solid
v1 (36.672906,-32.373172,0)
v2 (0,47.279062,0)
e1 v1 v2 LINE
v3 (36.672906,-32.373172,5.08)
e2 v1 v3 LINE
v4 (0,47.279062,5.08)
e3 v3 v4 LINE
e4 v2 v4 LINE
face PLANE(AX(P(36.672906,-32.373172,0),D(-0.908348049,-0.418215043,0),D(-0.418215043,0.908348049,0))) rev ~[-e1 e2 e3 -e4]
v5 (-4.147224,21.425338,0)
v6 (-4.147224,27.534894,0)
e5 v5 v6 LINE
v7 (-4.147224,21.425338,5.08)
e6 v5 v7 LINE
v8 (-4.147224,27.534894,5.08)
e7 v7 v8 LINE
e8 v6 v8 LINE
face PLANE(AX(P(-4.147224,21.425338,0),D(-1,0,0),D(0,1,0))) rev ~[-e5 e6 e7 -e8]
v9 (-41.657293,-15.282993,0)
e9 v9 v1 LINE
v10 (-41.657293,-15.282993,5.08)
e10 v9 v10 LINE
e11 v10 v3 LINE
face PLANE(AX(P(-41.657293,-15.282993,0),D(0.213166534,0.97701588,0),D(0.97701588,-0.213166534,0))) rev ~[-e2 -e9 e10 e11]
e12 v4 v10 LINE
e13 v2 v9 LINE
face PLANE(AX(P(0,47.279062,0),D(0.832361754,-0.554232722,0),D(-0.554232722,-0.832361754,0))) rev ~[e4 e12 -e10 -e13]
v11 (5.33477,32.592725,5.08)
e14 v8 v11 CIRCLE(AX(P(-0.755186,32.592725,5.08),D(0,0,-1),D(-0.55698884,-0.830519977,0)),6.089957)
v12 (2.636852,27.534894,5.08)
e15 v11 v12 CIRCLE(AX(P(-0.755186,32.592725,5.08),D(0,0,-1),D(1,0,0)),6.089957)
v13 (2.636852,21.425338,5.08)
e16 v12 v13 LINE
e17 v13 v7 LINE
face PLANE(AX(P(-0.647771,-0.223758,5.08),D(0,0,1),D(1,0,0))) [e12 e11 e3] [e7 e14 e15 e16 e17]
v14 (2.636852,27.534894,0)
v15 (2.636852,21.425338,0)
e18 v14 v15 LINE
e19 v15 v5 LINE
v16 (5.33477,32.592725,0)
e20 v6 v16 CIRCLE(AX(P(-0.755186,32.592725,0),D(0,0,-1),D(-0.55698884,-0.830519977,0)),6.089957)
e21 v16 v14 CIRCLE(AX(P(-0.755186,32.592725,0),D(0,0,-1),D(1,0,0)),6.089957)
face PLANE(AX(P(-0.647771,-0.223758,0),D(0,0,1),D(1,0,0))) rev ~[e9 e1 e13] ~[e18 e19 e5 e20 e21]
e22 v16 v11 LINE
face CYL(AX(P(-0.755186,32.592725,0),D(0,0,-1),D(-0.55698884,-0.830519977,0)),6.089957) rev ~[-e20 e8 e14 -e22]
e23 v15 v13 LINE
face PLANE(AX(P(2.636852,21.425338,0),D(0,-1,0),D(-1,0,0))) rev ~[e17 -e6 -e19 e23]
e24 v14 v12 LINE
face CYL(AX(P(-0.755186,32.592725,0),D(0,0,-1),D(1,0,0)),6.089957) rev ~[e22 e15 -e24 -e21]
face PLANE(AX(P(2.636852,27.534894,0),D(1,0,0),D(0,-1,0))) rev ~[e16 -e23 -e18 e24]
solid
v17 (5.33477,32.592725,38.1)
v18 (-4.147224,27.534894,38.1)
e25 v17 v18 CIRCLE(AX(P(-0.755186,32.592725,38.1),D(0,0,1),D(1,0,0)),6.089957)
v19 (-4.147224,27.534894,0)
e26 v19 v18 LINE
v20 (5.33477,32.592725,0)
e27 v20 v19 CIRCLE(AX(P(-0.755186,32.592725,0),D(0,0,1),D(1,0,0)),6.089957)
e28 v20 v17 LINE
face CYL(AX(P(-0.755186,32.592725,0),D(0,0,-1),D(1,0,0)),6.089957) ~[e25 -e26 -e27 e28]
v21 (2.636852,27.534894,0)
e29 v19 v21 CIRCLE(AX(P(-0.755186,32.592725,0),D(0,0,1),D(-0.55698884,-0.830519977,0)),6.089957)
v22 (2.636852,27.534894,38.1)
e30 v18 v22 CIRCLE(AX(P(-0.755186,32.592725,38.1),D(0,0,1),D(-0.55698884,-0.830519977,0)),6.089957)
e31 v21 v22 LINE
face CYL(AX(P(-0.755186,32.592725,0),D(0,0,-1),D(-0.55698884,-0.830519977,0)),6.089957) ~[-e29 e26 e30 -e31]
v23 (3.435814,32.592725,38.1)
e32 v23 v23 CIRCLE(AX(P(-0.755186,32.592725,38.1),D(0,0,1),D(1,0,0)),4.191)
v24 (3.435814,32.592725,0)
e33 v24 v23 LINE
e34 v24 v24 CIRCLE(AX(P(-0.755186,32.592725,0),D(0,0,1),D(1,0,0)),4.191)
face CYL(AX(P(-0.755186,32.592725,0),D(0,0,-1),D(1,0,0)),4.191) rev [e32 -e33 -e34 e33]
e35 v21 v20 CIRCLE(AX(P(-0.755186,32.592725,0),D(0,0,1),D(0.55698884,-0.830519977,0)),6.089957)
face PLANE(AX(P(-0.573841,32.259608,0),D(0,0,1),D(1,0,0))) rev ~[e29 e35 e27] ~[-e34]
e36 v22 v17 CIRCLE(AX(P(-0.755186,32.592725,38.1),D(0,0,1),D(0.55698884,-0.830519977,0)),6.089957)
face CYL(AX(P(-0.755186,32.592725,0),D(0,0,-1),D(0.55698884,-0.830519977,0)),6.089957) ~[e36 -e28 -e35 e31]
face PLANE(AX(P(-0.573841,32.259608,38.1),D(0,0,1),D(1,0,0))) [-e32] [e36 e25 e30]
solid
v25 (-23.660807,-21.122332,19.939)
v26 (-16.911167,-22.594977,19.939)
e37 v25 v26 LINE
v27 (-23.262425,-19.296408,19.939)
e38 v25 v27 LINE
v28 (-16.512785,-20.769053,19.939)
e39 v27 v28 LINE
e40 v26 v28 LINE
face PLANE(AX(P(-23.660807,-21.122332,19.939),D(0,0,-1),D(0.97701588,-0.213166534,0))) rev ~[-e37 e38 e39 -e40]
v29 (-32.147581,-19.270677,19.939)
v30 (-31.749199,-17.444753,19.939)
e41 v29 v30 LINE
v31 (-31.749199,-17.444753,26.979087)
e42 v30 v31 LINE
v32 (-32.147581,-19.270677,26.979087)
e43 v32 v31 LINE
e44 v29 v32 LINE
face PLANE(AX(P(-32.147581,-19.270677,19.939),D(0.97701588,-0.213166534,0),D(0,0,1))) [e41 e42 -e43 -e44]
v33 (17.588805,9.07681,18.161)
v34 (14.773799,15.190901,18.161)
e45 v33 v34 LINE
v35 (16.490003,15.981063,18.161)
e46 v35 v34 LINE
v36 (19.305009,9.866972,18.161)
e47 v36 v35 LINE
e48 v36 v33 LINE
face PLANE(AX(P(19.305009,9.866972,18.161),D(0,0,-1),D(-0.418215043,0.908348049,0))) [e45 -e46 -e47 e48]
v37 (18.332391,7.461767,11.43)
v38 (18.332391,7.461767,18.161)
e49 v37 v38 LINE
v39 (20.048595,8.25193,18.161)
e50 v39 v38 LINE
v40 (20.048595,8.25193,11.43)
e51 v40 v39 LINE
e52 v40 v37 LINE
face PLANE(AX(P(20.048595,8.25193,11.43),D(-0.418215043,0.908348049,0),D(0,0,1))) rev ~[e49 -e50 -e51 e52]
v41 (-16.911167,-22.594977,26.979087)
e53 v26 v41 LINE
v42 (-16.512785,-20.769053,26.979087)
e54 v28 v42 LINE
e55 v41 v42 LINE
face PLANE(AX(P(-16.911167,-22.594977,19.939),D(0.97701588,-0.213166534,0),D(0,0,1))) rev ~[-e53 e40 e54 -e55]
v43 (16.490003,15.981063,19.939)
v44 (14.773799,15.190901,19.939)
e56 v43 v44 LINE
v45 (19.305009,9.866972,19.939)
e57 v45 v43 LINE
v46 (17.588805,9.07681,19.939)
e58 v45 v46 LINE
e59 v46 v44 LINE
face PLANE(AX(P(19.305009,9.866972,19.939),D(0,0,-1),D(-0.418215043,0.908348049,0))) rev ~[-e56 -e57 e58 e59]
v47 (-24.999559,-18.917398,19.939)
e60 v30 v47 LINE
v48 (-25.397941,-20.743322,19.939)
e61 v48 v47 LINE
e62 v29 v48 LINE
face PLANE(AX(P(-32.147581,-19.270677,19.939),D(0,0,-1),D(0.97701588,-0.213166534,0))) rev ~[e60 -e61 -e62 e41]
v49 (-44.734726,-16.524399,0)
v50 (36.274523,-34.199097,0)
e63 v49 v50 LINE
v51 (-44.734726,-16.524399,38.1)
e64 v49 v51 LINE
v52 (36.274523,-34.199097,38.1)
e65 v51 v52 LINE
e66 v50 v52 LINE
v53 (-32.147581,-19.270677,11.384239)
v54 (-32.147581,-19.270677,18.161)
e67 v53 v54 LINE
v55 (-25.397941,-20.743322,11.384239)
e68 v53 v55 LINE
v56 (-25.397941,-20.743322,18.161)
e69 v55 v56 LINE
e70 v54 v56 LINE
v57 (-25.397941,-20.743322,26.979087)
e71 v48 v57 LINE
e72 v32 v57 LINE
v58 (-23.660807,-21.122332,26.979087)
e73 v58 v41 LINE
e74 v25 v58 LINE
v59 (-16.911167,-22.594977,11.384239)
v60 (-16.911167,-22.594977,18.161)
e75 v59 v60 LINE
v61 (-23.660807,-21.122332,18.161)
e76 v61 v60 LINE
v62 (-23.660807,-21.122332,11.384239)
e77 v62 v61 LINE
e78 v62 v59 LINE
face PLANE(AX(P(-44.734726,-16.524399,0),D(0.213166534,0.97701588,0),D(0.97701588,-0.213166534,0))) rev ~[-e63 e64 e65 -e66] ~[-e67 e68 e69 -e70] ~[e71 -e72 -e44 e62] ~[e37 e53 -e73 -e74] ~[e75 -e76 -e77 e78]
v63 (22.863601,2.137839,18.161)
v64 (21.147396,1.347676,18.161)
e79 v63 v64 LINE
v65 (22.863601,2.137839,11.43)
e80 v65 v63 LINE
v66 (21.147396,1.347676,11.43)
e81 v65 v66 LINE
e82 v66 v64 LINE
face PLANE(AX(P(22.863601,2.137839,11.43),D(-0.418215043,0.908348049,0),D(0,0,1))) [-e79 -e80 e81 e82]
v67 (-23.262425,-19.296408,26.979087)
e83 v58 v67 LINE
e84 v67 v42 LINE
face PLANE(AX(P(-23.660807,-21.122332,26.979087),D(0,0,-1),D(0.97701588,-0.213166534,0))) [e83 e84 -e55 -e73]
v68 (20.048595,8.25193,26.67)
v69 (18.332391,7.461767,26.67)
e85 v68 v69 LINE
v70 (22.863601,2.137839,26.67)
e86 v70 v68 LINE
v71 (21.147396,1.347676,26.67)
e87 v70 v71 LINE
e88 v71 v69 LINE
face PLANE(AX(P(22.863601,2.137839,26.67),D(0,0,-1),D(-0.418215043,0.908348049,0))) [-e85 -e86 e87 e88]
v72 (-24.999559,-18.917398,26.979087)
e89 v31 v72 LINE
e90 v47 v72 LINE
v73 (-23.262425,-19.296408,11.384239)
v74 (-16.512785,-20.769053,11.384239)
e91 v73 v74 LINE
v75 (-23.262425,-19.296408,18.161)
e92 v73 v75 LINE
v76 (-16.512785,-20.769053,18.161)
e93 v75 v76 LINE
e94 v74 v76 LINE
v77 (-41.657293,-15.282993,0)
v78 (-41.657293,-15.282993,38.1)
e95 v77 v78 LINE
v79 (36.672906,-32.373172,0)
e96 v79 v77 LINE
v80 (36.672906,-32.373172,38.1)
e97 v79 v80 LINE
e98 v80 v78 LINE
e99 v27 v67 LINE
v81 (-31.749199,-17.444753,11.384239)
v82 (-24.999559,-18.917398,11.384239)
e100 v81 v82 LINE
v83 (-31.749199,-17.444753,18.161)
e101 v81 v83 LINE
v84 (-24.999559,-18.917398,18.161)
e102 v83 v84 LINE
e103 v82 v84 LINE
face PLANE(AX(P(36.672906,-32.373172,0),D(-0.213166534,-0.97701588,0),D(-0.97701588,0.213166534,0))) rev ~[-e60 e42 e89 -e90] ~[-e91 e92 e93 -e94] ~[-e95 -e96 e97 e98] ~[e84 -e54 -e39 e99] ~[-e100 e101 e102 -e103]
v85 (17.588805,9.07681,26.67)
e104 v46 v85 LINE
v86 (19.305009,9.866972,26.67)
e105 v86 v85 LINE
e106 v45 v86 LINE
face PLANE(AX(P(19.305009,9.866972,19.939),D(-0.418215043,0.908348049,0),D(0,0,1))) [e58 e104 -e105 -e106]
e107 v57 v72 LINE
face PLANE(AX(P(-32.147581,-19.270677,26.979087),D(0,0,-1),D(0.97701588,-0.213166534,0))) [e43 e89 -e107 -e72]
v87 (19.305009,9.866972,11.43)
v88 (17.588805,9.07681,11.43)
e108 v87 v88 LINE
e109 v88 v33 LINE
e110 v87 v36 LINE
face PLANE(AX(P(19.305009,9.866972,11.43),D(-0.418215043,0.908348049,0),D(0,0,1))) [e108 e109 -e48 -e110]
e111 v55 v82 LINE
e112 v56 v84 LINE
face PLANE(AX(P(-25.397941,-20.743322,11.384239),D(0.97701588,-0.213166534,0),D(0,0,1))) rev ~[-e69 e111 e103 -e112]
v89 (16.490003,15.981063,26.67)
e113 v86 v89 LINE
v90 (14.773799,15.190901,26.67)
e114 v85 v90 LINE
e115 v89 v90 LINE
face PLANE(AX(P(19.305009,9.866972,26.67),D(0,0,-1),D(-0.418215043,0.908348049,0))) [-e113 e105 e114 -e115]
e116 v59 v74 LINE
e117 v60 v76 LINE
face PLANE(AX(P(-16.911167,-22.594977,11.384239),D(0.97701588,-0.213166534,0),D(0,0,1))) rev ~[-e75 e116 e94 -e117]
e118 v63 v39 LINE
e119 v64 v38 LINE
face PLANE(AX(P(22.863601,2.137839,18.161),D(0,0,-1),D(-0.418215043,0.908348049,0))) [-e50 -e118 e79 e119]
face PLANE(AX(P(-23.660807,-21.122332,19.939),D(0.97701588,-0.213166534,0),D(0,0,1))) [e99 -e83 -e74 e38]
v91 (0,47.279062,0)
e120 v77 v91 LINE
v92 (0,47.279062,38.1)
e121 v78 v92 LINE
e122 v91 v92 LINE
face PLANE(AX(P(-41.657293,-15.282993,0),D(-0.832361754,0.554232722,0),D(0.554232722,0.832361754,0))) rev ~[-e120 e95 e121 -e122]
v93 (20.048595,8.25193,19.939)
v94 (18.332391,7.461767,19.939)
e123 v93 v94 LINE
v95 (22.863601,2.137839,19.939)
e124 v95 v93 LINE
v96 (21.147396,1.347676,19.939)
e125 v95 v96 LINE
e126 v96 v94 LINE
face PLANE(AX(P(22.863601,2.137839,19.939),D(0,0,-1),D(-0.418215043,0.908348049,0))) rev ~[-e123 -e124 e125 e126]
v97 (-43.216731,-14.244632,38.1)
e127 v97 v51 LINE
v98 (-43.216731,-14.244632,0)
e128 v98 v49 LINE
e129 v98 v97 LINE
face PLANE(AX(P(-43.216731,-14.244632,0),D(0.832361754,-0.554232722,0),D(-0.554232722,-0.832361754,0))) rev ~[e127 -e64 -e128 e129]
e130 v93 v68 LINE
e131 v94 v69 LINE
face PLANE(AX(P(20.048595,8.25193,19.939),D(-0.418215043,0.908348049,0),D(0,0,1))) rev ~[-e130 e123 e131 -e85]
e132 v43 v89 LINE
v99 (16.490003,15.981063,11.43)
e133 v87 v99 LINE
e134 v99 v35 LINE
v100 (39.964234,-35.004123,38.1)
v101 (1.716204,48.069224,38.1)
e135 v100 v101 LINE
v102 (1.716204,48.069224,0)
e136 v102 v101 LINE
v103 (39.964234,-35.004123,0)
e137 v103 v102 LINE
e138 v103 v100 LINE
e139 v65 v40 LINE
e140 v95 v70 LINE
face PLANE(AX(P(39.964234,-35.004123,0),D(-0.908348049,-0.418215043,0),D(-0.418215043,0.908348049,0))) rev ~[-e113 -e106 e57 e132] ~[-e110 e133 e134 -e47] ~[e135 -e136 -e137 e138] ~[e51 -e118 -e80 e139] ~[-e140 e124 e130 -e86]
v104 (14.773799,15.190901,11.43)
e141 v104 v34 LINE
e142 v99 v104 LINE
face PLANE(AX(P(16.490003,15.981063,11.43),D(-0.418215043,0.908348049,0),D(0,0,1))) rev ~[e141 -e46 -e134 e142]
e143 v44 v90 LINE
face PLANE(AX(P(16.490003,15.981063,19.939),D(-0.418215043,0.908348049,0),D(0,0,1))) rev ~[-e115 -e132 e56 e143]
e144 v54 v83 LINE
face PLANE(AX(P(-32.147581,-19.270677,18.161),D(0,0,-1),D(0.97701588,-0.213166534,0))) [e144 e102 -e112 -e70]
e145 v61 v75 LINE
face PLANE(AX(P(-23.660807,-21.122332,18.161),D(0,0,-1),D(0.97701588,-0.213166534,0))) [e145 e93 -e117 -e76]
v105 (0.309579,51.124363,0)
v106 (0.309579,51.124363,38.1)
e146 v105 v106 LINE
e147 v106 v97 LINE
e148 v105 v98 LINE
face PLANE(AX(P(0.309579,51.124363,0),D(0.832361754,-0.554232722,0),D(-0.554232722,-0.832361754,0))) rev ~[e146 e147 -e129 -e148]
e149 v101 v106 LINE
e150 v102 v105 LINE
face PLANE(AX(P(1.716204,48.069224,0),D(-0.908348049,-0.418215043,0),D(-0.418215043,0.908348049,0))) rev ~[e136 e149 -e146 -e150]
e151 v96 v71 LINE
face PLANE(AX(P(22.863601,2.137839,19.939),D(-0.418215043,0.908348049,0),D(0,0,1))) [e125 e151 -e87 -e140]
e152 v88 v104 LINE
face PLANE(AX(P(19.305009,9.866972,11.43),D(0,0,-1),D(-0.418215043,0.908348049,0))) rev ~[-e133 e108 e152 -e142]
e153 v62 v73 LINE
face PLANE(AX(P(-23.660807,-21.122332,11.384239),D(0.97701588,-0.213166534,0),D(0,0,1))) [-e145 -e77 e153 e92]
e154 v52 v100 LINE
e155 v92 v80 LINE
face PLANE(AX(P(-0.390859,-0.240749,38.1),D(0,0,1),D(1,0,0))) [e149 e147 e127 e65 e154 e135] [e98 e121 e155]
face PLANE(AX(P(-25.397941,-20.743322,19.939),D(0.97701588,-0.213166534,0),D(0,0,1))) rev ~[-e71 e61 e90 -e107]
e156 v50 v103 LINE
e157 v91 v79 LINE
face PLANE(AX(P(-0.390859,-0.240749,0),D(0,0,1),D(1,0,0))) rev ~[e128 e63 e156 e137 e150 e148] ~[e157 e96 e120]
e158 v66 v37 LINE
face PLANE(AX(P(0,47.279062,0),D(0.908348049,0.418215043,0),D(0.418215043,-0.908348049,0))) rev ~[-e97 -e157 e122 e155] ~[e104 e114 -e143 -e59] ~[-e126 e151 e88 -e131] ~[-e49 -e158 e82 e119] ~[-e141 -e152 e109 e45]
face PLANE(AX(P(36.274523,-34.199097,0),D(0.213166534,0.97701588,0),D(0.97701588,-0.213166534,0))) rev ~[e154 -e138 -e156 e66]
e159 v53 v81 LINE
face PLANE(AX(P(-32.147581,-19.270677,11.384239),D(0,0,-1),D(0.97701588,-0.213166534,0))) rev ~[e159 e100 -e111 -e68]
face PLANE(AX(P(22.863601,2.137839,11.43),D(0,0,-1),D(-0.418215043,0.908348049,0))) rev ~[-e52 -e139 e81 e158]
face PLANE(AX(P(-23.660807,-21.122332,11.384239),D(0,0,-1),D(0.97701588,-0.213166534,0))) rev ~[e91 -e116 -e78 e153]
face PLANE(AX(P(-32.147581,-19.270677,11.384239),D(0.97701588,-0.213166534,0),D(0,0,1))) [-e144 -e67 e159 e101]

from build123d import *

# Parameters (mm, degrees)
F1_DEPTH = 38.1
F0_R     = 4.191
F2_DEPTH = 5.08
F3_W     = 6.9084239401
F3_H     = 7.0400872709
F3_H_2   = 6.7767606093
F4_DEPTH = 1.905
F5_W     = 6.731
F5_H     = 6.731
F6_DEPTH = 2.54


# Not quite as in the source:
# - a feature names something its author has since deleted; it is built from what else it names


with BuildPart() as f1:
    # F0 (on Top) → F1 (new body)
    with BuildSketch(Plane.XY):
        Polygon((0.3095794826, 51.1243626163), (-43.2167308403, -14.2446323873), (-44.7347259133, -16.5243986163), (36.2745233354, -34.199096887), (39.9642340225, -35.0041225317), (1.7162043522, 48.0692239296), align=None)
        Polygon((-41.6572931301, -15.282992694), (0, 47.2790615276), (36.6729057896, -32.3731724479), align=None, mode=Mode.SUBTRACT)
    extrude(amount=F1_DEPTH)

    # F3 (on face) → F4 (cut)
    with BuildSketch(Plane(origin=(-5.4742330467, -25.0903015448, 0), x_dir=(0.9770158795, -0.2131665339, 0), z_dir=(-0.2131665339, -0.9770158795, 0))):
        with Locations((-23.8466220251, 23.4590436355)):
            Rectangle(F3_W, F3_H)
        with Locations((-23.8466220251, 14.7726196953)):
            Rectangle(F3_W, F3_H_2)
        with Locations((-15.1601980849, 14.7726196953)):
            Rectangle(F3_W, F3_H_2)
        with Locations((-15.1601980849, 23.4590436355)):
            Rectangle(F3_W, F3_H)
    extrude(amount=-F4_DEPTH, mode=Mode.SUBTRACT)

    # F5 (on face) → F6 (cut)
    with BuildSketch(Plane(origin=(19.6768020366, 9.0594509571, 0), x_dir=(-0.4182150426, 0.908348049, 0), z_dir=(0.908348049, 0.4182150426, 0))):
        with Locations((-4.2545, 23.3045)):
            Rectangle(F5_W, F5_H)
        with Locations((-4.2545, 14.7955)):
            Rectangle(F5_W, F5_H)
        with Locations((4.2545, 14.7955)):
            Rectangle(F5_W, F5_H)
        with Locations((4.2545, 23.3045)):
            Rectangle(F5_W, F5_H)
    extrude(amount=-F6_DEPTH, mode=Mode.SUBTRACT)


with BuildPart() as f1b:
    # F0 (on Top) → F1, piece 2 (new body)
    with BuildSketch(Plane.XY):
        with BuildLine():
            ThreePointArc((2.6368516072, 27.5348942884), (4.6181244636, 29.726524701), (5.3347704338, 32.5927250691))
            ThreePointArc((5.3347704338, 32.5927250691), (-3.6213867329, 37.9660358976), (-4.1472243368, 27.5348942884))
            ThreePointArc((-4.1472243368, 27.5348942884), (-0.7551863648, 26.5027682705), (2.6368516072, 27.5348942884))
        make_face()
        with Locations((-0.7551863648, 32.5927250691)):
            Circle(F0_R, mode=Mode.SUBTRACT)
    extrude(amount=F1_DEPTH)


with BuildPart() as f2:
    # F0 (on Top) → F2 (new body)
    with BuildSketch(Plane.XY):
        Polygon((36.6729057896, -32.3731724479), (0, 47.2790615276), (-41.6572931301, -15.282992694), align=None)
        with BuildLine():
            ThreePointArc((-4.1472243368, 27.5348942884), (-3.6213867329, 37.9660358976), (5.3347704338, 32.5927250691))
            ThreePointArc((5.3347704338, 32.5927250691), (4.6181244636, 29.726524701), (2.6368516072, 27.5348942884))
            Line((2.6368516072, 27.5348942884), (2.6368516072, 21.4253379491))
            Line((2.6368516072, 21.4253379491), (-0.7551863648, 21.4253379491))
            Line((-0.7551863648, 21.4253379491), (-4.1472243368, 21.4253379491))
            Line((-4.1472243368, 21.4253379491), (-4.1472243368, 27.5348942884))
        make_face(mode=Mode.SUBTRACT)
    extrude(amount=F2_DEPTH)


solid = Compound([f1.part, f1b.part, f2.part])
